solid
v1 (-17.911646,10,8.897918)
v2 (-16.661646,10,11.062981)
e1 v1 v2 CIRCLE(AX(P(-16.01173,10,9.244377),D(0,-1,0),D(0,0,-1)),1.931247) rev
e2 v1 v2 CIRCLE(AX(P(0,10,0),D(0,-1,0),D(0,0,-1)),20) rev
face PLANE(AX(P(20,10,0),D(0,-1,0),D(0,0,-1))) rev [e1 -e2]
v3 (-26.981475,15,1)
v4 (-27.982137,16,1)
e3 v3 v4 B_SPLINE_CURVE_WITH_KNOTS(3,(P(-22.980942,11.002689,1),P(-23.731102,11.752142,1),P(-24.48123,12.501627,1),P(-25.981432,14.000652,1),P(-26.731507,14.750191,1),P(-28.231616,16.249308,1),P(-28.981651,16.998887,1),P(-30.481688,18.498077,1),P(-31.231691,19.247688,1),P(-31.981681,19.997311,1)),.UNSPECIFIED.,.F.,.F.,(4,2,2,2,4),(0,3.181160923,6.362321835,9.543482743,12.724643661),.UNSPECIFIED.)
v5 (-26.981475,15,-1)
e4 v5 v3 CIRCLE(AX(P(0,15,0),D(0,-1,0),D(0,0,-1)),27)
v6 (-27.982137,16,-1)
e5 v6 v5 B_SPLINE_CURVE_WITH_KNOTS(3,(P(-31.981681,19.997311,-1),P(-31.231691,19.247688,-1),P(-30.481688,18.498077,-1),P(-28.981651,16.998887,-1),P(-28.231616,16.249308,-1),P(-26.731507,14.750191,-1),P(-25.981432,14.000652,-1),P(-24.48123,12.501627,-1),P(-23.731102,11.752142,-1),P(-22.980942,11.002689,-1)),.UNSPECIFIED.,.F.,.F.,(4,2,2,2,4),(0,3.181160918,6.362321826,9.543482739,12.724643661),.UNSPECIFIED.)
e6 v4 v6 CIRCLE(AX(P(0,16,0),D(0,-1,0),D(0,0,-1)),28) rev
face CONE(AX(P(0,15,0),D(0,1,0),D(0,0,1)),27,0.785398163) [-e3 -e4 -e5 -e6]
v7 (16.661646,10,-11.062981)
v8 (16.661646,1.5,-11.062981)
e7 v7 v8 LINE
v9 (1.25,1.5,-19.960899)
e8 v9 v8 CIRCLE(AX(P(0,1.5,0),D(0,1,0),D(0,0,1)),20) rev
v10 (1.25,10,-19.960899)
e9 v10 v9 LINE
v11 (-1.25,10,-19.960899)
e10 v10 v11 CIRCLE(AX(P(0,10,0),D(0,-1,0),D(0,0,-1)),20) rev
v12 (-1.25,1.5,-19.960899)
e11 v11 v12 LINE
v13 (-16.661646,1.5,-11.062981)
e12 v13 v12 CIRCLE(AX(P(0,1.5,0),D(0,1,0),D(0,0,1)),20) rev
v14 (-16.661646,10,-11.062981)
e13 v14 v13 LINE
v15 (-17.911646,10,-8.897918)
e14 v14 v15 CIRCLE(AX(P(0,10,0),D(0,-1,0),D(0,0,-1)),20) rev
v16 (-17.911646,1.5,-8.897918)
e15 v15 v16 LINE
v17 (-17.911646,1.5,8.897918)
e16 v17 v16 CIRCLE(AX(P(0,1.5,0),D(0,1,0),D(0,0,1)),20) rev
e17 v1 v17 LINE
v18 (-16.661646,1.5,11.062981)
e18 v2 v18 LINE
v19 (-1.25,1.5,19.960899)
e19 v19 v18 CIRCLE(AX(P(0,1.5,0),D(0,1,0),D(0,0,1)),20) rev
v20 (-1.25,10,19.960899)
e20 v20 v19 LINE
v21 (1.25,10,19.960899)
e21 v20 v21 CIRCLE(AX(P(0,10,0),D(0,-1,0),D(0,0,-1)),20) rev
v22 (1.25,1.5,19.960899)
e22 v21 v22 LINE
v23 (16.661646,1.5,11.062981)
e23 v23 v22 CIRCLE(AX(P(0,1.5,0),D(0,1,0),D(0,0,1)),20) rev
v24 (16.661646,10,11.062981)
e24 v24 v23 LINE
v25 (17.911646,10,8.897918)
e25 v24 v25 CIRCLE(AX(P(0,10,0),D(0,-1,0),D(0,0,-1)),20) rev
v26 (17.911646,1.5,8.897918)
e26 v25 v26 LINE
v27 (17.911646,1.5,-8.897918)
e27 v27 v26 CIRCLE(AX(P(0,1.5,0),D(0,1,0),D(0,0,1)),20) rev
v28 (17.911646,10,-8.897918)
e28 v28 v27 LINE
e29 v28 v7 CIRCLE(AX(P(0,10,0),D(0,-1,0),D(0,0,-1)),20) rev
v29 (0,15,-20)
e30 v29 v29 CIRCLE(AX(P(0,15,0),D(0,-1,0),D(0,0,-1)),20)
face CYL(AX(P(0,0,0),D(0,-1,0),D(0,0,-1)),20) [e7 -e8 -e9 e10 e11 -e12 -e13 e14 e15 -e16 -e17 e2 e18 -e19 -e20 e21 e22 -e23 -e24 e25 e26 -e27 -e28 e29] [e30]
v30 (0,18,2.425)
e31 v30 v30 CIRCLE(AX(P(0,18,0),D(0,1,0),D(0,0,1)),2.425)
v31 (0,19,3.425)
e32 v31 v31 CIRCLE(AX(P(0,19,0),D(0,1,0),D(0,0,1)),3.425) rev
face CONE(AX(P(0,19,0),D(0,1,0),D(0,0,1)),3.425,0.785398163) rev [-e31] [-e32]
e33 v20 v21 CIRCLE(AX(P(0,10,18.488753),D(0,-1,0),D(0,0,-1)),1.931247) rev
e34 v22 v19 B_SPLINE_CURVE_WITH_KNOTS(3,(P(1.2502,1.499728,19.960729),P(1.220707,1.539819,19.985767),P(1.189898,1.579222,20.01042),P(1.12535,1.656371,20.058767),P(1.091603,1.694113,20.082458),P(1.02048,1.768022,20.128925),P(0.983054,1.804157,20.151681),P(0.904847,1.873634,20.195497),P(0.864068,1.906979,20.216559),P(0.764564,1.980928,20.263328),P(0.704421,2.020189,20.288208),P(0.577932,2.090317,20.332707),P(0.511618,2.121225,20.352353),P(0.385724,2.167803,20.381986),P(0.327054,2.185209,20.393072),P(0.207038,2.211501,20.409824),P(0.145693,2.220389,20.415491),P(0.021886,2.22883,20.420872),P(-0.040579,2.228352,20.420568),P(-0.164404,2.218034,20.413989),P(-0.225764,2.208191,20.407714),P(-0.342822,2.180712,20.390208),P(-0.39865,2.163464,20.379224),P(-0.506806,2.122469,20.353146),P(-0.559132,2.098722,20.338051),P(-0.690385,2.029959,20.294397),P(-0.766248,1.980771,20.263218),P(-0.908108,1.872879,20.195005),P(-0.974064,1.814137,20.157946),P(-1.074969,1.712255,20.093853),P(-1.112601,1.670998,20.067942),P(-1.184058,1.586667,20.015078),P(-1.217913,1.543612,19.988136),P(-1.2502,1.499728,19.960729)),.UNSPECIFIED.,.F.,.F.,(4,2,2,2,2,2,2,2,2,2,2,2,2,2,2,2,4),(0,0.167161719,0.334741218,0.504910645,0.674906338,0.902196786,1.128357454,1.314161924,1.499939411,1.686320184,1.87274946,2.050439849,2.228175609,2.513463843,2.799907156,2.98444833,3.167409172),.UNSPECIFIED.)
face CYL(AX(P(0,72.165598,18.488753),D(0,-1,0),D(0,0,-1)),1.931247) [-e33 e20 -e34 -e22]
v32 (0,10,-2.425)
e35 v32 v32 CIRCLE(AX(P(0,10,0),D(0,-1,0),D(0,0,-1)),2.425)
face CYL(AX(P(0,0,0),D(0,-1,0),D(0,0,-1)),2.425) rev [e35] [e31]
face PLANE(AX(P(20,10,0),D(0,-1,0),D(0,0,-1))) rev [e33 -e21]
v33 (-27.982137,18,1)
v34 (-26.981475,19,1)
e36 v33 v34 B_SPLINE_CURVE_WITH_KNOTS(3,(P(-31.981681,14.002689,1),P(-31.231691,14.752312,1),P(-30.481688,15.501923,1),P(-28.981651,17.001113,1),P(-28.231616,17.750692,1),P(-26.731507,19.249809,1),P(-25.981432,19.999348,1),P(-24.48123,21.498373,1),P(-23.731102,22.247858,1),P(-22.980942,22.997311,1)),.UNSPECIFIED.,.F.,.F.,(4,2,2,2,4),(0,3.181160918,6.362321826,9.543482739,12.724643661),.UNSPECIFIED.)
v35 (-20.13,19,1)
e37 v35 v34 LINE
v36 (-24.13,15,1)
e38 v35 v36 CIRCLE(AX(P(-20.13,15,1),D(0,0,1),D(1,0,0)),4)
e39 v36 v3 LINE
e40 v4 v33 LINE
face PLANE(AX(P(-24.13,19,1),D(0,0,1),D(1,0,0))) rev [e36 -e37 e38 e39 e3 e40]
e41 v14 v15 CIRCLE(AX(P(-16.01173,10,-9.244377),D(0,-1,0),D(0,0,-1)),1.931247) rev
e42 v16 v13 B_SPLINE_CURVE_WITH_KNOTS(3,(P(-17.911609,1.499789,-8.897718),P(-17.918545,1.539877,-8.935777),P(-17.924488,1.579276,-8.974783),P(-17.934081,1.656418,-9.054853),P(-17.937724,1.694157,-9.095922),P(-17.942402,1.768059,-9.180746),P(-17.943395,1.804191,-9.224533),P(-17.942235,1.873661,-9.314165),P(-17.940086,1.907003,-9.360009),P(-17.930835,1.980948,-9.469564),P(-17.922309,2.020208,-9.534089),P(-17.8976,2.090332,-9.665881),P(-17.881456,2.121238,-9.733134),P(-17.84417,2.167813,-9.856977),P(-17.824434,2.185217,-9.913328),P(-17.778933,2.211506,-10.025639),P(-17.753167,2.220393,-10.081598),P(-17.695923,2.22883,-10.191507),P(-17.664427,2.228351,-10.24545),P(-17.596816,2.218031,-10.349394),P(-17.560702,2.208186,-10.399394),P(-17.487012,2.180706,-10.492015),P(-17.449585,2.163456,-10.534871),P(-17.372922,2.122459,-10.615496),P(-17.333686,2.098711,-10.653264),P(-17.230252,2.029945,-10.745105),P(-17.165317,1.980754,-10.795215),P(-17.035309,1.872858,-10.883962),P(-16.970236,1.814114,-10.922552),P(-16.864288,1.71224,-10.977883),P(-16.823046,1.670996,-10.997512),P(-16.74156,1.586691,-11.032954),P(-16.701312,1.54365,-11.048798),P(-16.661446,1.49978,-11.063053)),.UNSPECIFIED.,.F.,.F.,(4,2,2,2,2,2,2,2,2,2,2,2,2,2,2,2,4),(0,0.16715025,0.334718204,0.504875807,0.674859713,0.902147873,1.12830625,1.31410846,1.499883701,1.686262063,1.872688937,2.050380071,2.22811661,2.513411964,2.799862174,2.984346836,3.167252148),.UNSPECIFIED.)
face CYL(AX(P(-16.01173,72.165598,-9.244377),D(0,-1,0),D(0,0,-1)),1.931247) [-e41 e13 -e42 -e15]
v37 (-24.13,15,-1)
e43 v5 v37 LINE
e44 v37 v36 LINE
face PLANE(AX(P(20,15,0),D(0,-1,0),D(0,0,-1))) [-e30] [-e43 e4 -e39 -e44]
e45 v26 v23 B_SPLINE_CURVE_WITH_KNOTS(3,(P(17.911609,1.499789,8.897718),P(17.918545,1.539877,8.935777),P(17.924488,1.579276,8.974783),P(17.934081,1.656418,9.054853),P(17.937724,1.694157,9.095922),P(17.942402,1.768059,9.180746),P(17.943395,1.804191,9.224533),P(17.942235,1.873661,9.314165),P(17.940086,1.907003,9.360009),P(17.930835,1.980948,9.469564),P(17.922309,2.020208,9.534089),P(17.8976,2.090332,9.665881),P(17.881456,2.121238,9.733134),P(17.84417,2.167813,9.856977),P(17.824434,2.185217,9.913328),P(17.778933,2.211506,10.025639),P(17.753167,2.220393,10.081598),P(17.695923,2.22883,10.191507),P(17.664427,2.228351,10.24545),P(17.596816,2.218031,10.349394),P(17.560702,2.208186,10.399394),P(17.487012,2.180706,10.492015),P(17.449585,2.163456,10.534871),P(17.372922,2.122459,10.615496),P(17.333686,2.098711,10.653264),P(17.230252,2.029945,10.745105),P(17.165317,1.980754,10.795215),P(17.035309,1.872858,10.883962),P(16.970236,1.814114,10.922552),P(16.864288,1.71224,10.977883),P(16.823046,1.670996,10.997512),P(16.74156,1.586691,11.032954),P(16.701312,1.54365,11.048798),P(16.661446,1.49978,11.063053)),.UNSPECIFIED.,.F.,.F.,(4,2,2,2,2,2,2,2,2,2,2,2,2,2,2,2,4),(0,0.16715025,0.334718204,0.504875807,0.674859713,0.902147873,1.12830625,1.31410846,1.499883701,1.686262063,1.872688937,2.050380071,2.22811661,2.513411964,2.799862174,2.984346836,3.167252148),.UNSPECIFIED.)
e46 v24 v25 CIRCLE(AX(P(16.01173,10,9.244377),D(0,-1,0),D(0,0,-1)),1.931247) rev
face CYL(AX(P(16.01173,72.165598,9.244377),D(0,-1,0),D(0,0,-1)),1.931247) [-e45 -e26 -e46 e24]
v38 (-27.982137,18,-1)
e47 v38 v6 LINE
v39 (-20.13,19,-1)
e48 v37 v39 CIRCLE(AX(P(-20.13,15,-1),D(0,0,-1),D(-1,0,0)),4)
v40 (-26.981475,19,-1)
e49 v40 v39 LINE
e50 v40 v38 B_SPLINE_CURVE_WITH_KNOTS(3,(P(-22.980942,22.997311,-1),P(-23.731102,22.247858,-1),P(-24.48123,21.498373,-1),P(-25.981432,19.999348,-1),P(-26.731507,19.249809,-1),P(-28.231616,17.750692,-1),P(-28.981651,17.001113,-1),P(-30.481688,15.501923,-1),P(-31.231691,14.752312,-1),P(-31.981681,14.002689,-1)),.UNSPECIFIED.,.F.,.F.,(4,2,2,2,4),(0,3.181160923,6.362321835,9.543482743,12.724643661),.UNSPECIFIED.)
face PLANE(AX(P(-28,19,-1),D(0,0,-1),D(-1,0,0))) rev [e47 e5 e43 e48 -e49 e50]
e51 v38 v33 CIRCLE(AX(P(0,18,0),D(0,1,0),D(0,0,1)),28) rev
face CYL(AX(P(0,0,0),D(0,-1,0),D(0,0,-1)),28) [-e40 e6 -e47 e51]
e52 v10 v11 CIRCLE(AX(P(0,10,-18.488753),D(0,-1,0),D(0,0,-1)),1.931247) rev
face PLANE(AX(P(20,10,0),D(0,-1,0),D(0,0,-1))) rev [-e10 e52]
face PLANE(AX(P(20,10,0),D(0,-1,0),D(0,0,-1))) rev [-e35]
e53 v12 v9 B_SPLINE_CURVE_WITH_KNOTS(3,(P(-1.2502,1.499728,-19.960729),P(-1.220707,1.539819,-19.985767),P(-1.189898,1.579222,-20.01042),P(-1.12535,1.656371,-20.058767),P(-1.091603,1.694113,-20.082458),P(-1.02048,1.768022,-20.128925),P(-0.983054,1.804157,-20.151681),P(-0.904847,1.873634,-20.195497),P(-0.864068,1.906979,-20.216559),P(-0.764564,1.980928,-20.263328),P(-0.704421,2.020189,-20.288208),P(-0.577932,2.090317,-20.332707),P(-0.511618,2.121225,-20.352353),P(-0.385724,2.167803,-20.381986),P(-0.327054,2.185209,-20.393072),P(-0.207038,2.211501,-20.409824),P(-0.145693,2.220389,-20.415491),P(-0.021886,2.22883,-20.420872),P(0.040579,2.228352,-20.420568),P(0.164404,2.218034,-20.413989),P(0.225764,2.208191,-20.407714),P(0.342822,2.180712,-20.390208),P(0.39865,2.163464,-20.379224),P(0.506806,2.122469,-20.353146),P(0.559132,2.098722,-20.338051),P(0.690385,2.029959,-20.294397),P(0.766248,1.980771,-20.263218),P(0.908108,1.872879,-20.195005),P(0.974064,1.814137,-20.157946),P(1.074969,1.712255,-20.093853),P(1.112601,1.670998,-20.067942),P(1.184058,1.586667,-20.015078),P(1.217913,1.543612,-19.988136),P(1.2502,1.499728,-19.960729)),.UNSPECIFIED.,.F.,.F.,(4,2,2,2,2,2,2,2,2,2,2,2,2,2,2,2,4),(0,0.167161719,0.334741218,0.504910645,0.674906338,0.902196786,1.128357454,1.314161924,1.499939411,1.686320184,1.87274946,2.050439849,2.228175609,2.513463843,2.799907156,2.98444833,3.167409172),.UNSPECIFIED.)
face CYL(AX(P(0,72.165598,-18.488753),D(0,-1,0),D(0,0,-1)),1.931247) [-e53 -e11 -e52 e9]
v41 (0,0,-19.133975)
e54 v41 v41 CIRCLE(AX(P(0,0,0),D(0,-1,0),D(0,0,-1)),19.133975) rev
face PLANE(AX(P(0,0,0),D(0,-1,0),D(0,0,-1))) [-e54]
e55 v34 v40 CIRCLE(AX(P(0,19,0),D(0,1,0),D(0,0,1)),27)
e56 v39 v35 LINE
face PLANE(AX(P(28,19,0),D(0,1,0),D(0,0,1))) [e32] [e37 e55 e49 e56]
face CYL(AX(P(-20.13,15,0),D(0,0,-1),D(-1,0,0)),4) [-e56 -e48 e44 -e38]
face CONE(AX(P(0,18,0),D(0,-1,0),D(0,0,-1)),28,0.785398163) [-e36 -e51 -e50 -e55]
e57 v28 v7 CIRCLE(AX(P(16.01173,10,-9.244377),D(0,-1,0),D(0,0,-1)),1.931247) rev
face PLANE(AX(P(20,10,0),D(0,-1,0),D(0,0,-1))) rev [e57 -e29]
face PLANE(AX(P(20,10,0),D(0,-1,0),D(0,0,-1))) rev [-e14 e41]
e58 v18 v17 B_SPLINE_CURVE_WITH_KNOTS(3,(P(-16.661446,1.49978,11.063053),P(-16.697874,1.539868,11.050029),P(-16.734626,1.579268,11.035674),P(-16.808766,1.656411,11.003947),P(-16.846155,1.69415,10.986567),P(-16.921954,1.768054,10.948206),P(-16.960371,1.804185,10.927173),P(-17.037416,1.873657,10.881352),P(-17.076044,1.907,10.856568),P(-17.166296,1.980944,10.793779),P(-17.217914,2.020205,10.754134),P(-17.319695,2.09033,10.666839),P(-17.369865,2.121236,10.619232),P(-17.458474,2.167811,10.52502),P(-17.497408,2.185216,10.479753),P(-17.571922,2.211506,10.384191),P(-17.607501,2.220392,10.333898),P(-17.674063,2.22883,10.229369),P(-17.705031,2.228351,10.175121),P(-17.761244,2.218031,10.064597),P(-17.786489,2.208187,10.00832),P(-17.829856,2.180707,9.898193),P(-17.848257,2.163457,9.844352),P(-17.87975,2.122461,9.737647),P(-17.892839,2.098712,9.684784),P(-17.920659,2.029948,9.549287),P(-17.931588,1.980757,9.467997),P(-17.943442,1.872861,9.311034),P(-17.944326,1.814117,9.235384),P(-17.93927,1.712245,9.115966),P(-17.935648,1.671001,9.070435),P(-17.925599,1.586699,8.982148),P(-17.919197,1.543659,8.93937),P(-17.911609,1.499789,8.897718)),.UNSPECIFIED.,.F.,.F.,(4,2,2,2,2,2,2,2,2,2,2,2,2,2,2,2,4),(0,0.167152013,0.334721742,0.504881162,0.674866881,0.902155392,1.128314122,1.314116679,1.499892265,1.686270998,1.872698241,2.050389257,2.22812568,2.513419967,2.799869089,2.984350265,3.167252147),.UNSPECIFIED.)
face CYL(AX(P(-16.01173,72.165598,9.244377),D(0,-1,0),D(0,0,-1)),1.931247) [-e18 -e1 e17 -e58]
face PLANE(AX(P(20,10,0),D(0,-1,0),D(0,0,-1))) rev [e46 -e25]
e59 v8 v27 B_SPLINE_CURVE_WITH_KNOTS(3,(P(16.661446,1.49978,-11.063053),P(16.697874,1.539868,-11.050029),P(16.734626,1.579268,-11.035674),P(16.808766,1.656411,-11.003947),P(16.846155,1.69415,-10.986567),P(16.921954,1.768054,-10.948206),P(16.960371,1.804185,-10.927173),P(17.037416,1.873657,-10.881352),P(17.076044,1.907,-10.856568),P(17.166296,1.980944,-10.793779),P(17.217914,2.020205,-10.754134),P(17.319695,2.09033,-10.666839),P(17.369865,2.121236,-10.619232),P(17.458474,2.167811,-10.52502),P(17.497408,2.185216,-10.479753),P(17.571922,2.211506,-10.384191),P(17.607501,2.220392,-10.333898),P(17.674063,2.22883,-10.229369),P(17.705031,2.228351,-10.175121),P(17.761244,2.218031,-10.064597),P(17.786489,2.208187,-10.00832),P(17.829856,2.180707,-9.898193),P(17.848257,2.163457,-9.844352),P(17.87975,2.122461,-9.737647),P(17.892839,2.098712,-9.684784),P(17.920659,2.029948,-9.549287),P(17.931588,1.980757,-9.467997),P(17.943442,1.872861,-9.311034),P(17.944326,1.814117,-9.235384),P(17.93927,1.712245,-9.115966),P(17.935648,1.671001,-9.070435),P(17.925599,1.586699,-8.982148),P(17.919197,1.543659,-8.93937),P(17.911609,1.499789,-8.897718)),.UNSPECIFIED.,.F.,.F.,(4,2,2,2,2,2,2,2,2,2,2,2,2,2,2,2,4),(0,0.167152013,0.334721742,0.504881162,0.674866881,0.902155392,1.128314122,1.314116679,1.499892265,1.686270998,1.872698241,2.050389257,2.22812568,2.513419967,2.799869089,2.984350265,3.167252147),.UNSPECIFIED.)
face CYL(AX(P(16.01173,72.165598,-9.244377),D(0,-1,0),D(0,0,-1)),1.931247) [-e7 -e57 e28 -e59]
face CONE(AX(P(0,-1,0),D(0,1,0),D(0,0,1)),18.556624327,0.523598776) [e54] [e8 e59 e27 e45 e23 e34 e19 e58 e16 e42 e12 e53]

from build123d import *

# Parameters (mm, degrees)
BOSS_EXTRUDE1_START = -10
BOSS_EXTRUDE1_DEPTH = 10
CHAMFER1_SIZE       = 1
SKETCH4_W           = 3.87
SKETCH4_H           = 2
CUT_EXTRUDE1_DEPTH  = 44.920382512
FILLET1_R           = 4


with BuildPart() as part:
    # Sketch1 → Revolve1 (revolve)
    with BuildSketch(Plane.XY, mode=Mode.PRIVATE) as revolve1_sk:
        Polygon((0, 0), (20, 0), (20, 15), (28, 15), (28, 19), (2.425, 19), (2.425, 9), (0, 9), align=None)
    revolve(revolve1_sk.sketch.rotate(Axis((0, 0, 0), (0, 1, 0)), 90), axis=Axis((0, 0, 0), (0, 1, 0)))

    # Sketch2 → Boss-Extrude1 (add)
    with BuildSketch(Plane.XZ.offset(BOSS_EXTRUDE1_START)):
        with BuildLine():
            ThreePointArc((-1.25, 19.960899278), (0, 20.42), (1.25, 19.960899278))
            ThreePointArc((1.25, 19.960899278), (10, 17.320508076), (16.661645857, 11.062981394))
            ThreePointArc((16.661645857, 11.062981394), (17.684238745, 10.21), (17.911645857, 8.897917884))
            ThreePointArc((17.911645857, 8.897917884), (20, 0), (17.911645857, -8.897917884))
            ThreePointArc((17.911645857, -8.897917884), (17.684238745, -10.21), (16.661645857, -11.062981394))
            ThreePointArc((16.661645857, -11.062981394), (10, -17.320508076), (1.25, -19.960899278))
            ThreePointArc((1.25, -19.960899278), (0, -20.42), (-1.25, -19.960899278))
            ThreePointArc((-1.25, -19.960899278), (-10, -17.320508076), (-16.661645857, -11.062981394))
            ThreePointArc((-16.661645857, -11.062981394), (-17.684238745, -10.21), (-17.911645857, -8.897917884))
            ThreePointArc((-17.911645857, -8.897917884), (-20, 0), (-17.911645857, 8.897917884))
            ThreePointArc((-17.911645857, 8.897917884), (-17.684238745, 10.21), (-16.661645857, 11.062981394))
            ThreePointArc((-16.661645857, 11.062981394), (-10, 17.320508076), (-1.25, 19.960899278))
        make_face()
    extrude(amount=BOSS_EXTRUDE1_DEPTH)

    # Sketch3 → Cut-Revolve1 (revolve, cut)
    with BuildSketch(Plane.XY, mode=Mode.PRIVATE) as cut_revolve1_sk:
        Polygon((-21, 3.232050808), (-18.556624327, -1), (-21, -1), align=None)
    revolve(cut_revolve1_sk.sketch.rotate(Axis((0, 29.336873575, 0), (0, -1, 0)), 273.58332148), axis=Axis((0, 29.336873575, 0), (0, -1, 0)), mode=Mode.SUBTRACT)

    # Chamfer1
    chamfer1_edges = [part.edges().sort_by_distance(p)[0] for p in [
        (0, 19, 2.425),
        (0, 19, 28),
        (0, 15, 28),
    ]]
    chamfer(chamfer1_edges, length=CHAMFER1_SIZE)

    # Sketch4 → Cut-Extrude1 (cut, through all)
    with BuildSketch(Plane.XZ):
        with Locations((-26.065, 0)):
            Rectangle(SKETCH4_W, SKETCH4_H)
    extrude(amount=-CUT_EXTRUDE1_DEPTH, mode=Mode.SUBTRACT)

    # Fillet1
    fillet1_edges = [part.edges().sort_by_distance(p)[0] for p in [
        (-24.13, 19, 0),
    ]]
    fillet(fillet1_edges, radius=FILLET1_R - 0.0001)  # a hair under: the kernel refuses the full size


solid = part.part
